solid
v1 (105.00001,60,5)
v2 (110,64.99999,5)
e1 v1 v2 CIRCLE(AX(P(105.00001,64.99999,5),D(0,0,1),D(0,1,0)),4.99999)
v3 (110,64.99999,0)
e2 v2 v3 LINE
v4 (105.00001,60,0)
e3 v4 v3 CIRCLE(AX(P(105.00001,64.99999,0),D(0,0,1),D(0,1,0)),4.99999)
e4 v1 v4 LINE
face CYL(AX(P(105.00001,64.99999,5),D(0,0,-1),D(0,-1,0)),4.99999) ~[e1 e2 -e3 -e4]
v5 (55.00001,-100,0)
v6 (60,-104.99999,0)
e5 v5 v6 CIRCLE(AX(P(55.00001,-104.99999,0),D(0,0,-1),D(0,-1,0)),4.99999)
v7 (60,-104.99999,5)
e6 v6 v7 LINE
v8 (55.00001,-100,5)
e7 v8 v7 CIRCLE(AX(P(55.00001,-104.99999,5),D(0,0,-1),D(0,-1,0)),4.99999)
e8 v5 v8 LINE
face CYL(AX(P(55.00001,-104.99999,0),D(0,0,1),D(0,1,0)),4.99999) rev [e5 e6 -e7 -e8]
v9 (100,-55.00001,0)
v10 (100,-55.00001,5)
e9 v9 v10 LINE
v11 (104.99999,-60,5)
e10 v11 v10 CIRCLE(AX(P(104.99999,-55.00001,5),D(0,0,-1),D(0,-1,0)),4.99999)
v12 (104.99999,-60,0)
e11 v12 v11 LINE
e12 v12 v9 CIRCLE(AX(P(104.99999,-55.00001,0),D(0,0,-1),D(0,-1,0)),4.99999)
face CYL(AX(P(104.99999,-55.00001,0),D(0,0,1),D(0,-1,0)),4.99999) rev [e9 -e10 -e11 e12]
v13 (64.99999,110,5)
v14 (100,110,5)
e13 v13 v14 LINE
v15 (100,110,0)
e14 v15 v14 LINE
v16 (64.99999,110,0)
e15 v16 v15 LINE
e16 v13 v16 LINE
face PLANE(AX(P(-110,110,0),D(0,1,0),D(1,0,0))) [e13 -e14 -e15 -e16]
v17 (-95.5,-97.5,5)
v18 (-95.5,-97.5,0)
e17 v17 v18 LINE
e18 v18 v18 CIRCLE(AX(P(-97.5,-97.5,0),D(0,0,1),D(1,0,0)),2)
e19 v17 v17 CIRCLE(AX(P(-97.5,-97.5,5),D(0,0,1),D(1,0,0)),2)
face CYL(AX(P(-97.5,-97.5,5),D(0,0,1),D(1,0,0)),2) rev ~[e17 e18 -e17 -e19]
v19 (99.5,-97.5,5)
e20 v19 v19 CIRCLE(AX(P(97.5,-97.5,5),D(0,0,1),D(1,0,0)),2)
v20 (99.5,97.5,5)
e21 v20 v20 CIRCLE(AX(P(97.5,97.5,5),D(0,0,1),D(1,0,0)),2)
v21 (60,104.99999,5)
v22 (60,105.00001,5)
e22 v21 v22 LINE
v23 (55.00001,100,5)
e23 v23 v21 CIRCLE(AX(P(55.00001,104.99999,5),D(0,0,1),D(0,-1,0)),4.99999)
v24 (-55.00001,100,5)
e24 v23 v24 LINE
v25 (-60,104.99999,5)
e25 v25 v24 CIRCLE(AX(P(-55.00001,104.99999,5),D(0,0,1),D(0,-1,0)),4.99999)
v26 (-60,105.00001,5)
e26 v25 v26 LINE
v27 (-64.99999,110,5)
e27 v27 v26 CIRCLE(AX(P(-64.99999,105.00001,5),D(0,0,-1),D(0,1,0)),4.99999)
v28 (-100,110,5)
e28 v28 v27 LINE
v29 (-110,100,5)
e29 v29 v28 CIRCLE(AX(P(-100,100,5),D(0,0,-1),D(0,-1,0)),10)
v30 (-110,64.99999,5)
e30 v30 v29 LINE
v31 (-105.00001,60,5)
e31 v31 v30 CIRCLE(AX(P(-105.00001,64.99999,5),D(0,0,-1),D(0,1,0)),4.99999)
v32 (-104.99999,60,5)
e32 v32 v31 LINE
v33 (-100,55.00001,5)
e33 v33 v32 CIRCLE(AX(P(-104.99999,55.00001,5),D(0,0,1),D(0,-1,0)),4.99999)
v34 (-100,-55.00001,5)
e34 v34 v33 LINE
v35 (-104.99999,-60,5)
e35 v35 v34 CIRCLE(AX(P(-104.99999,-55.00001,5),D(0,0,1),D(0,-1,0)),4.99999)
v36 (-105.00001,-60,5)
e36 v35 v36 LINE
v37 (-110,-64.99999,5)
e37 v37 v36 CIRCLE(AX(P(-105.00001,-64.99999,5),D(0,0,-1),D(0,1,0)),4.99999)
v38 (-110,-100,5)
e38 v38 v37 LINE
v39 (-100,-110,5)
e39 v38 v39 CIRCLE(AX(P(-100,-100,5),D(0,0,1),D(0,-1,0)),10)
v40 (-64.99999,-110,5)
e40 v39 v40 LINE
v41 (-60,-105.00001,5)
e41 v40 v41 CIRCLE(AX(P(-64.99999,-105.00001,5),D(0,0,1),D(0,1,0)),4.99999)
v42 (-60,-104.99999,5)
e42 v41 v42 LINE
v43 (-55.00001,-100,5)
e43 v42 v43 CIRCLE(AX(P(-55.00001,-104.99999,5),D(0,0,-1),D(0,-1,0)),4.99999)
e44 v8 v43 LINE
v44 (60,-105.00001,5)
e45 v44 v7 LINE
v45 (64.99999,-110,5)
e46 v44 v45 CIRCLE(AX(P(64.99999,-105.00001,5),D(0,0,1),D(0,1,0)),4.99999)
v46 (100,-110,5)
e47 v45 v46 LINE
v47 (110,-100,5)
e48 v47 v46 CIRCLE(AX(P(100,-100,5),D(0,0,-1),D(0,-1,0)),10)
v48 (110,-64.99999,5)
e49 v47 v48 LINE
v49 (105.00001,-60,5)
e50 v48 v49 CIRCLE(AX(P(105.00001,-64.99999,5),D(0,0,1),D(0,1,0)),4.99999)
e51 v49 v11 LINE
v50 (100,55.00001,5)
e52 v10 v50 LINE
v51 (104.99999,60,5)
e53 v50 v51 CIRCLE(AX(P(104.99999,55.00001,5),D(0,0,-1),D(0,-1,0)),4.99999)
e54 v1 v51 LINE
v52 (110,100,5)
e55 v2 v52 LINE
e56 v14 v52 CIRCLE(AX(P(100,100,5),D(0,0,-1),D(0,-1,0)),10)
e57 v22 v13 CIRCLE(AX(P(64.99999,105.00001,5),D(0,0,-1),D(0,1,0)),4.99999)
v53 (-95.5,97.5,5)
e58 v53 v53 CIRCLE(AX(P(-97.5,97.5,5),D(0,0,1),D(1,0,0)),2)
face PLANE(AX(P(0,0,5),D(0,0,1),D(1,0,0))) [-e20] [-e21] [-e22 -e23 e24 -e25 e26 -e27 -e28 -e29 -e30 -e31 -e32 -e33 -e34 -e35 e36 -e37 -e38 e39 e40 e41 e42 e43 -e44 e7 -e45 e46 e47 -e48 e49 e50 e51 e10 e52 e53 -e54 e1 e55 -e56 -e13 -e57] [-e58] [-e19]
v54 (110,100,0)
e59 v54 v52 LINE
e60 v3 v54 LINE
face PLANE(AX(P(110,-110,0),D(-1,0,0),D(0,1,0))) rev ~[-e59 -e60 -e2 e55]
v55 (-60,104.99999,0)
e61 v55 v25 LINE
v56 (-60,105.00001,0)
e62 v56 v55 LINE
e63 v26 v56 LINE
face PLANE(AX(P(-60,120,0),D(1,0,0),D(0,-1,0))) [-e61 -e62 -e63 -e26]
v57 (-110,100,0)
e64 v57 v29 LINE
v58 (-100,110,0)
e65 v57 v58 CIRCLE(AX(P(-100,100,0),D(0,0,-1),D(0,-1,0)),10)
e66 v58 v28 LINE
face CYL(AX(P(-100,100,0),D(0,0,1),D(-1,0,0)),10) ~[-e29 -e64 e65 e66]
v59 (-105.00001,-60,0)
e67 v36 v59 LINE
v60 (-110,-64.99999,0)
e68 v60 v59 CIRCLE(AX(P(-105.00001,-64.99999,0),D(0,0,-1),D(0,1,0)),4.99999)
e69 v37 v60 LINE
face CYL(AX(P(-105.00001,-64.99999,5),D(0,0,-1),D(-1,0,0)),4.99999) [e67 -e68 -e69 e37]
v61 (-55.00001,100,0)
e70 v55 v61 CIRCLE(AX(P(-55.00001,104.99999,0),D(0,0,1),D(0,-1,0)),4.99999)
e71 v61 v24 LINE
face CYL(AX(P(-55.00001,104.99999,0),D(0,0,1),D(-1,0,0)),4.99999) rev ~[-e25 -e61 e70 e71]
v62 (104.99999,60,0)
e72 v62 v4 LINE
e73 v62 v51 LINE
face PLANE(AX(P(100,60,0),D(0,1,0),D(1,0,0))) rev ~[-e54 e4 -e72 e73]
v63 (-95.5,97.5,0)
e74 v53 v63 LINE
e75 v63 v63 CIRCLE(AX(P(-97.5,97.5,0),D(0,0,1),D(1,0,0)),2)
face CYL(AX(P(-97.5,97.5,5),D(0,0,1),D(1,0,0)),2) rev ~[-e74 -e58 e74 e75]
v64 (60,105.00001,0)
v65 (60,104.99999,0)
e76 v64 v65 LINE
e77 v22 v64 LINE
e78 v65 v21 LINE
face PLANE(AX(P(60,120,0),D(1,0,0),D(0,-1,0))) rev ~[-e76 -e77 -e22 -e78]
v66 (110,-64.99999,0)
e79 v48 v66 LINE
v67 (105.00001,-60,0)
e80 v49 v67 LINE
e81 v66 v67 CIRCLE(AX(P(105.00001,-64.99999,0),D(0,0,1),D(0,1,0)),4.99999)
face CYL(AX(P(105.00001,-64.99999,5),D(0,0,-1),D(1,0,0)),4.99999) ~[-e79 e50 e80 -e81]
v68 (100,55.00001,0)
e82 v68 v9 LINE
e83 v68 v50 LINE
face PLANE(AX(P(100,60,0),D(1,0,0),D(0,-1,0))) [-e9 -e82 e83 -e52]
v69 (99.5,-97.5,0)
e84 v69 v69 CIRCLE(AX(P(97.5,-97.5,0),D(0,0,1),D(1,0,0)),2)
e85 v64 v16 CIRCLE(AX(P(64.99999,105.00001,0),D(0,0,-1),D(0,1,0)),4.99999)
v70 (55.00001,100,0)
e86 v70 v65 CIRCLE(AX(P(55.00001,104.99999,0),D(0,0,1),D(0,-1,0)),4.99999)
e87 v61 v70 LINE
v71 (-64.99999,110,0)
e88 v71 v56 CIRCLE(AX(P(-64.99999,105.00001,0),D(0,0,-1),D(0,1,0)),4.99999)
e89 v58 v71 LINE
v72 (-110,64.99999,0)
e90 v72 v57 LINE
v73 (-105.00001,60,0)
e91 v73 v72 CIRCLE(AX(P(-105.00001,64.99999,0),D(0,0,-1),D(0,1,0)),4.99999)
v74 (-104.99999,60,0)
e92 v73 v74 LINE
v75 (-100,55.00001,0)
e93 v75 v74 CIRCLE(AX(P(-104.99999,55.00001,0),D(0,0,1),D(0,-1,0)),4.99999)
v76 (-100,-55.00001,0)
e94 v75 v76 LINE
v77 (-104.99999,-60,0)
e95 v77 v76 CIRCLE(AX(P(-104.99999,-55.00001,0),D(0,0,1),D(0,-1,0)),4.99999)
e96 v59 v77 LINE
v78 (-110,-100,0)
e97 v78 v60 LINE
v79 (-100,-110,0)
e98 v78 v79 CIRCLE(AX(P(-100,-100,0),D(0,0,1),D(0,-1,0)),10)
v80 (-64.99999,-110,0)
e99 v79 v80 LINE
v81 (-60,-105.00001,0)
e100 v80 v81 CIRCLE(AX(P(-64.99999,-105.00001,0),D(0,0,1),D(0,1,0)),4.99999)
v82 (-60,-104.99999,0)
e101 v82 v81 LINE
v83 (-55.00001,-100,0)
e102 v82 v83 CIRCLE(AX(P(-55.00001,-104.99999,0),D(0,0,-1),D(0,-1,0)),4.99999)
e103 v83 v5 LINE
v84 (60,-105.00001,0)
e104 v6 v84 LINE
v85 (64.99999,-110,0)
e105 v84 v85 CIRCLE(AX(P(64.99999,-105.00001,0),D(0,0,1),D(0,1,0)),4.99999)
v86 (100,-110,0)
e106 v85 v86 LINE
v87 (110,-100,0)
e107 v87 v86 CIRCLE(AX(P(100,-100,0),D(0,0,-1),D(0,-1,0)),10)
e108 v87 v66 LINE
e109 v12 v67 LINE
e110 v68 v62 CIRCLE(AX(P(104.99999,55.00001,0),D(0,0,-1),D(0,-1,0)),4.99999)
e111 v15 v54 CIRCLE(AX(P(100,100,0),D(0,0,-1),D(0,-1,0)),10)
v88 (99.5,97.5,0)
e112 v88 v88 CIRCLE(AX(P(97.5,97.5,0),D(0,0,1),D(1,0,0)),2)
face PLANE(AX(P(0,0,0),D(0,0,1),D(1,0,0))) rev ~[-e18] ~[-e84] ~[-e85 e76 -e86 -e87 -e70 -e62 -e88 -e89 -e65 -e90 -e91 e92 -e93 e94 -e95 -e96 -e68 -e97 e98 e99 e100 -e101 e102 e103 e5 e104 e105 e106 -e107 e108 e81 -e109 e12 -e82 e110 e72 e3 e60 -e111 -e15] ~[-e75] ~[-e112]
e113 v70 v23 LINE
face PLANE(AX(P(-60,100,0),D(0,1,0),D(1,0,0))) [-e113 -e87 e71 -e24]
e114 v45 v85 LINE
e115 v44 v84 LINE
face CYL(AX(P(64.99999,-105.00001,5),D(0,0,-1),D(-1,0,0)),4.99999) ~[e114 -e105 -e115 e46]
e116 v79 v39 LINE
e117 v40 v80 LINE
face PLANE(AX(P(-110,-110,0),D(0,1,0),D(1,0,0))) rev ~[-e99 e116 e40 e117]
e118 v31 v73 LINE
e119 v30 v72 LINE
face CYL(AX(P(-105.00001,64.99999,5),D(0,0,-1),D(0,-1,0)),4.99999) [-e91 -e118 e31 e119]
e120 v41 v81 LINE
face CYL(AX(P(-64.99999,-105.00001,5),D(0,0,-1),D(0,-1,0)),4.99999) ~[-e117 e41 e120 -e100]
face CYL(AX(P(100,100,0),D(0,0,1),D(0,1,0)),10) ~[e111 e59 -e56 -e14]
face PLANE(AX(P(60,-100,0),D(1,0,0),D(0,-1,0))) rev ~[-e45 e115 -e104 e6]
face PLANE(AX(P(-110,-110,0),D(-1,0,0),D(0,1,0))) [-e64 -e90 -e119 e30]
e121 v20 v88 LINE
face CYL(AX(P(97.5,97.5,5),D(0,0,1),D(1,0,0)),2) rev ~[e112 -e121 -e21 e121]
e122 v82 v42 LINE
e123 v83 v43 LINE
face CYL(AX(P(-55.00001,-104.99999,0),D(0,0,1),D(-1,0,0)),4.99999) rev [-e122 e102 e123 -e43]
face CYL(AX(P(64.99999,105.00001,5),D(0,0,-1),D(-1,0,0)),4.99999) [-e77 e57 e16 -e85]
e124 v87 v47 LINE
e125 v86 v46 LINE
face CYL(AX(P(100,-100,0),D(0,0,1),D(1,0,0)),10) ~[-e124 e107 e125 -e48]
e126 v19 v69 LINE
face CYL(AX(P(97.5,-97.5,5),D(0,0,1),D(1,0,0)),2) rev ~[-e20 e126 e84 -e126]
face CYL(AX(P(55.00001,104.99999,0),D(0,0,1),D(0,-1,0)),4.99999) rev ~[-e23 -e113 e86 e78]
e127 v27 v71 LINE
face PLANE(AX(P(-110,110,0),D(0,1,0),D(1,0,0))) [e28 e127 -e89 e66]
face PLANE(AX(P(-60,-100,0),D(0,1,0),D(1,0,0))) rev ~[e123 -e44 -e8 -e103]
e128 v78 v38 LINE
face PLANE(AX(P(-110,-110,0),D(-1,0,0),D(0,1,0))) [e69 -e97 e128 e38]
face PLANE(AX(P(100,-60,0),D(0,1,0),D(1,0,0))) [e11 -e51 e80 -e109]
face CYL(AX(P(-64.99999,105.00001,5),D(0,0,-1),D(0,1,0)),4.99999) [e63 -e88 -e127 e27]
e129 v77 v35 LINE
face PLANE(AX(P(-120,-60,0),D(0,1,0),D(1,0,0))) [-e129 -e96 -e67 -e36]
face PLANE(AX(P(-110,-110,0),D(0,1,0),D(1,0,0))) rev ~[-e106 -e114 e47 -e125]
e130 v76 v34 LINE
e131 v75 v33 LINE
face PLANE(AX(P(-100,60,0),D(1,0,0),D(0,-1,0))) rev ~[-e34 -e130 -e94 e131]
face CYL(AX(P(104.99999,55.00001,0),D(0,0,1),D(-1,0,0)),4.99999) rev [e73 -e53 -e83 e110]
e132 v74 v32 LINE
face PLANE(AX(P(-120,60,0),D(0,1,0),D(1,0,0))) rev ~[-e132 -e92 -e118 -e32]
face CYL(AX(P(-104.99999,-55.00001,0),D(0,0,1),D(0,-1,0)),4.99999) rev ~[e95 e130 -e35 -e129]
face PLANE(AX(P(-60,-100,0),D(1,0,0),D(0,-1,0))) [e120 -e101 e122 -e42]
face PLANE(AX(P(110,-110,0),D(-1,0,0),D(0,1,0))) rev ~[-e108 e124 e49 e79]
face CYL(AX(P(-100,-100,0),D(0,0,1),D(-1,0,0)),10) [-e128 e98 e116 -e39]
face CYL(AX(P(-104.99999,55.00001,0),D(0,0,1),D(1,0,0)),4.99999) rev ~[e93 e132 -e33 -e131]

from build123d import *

# Parameters (mm, degrees)
F0_W     = 220
F0_H     = 220
F1_DEPTH = 5
F2_R     = 2
F3_DEPTH = 5.001
F4_W     = 20
F4_H     = 120
F4_W_2   = 120
F4_H_2   = 20
F5_DEPTH = 5.001
F6_R     = 10
F7_R     = 4.99999


# Not quite as in the source:
# - a fillet or chamfer is up to 0.001 mm smaller than in the source, because OpenCascade refuses the exact size


with BuildPart() as f1:
    # F0 (on Top) → F1 (new body)
    with BuildSketch(Plane.XY):
        Rectangle(F0_W, F0_H)
    extrude(amount=F1_DEPTH)

    # F2 (on face) → F3 (cut, through all)
    with BuildSketch(Plane.XY.offset(5)):
        with Locations((-97.5, 97.5)):
            Circle(F2_R)
        with Locations((-97.5, -97.5)):
            Circle(F2_R)
        with Locations((97.5, -97.5)):
            Circle(F2_R)
        with Locations((97.5, 97.5)):
            Circle(F2_R)
    extrude(amount=-F3_DEPTH, mode=Mode.SUBTRACT)

    # F4 (on face) → F5 (cut, through all)
    with BuildSketch(Plane(origin=(0, 0, 0), x_dir=(1, 0, 0), z_dir=(0, 0, -1))):
        with Locations((110, 0)):
            Rectangle(F4_W, F4_H)
        with Locations((0, 110)):
            Rectangle(F4_W_2, F4_H_2)
        with Locations((-110, 0)):
            Rectangle(F4_W, F4_H)
        with Locations((0, -110)):
            Rectangle(F4_W_2, F4_H_2)
    extrude(amount=-F5_DEPTH, mode=Mode.SUBTRACT)

    # F6
    f6_edges = [f1.edges().sort_by_distance(p)[0] for p in [
        (110, -110, 2.5),
        (-110, -110, 2.5),
        (110, 110, 2.5),
        (-110, 110, 2.5),
    ]]
    fillet(f6_edges, radius=F6_R)

    # F7 (radius 5 in the source; OpenCascade refuses exactly that, so slightly less here)
    f7_edges = [f1.edges().sort_by_distance(p)[0] for p in [
        (110, 60, 2.5),
        (100, 60, 2.5),
        (100, -60, 2.5),
        (110, -60, 2.5),
        (60, -100, 2.5),
        (60, -110, 2.5),
        (-60, -100, 2.5),
        (-60, -110, 2.5),
        (-100, -60, 2.5),
        (-110, -60, 2.5),
        (-100, 60, 2.5),
        (-110, 60, 2.5),
        (-60, 100, 2.5),
        (-60, 110, 2.5),
        (60, 100, 2.5),
        (60, 110, 2.5),
    ]]
    fillet(f7_edges, radius=F7_R)


solid = f1.part
